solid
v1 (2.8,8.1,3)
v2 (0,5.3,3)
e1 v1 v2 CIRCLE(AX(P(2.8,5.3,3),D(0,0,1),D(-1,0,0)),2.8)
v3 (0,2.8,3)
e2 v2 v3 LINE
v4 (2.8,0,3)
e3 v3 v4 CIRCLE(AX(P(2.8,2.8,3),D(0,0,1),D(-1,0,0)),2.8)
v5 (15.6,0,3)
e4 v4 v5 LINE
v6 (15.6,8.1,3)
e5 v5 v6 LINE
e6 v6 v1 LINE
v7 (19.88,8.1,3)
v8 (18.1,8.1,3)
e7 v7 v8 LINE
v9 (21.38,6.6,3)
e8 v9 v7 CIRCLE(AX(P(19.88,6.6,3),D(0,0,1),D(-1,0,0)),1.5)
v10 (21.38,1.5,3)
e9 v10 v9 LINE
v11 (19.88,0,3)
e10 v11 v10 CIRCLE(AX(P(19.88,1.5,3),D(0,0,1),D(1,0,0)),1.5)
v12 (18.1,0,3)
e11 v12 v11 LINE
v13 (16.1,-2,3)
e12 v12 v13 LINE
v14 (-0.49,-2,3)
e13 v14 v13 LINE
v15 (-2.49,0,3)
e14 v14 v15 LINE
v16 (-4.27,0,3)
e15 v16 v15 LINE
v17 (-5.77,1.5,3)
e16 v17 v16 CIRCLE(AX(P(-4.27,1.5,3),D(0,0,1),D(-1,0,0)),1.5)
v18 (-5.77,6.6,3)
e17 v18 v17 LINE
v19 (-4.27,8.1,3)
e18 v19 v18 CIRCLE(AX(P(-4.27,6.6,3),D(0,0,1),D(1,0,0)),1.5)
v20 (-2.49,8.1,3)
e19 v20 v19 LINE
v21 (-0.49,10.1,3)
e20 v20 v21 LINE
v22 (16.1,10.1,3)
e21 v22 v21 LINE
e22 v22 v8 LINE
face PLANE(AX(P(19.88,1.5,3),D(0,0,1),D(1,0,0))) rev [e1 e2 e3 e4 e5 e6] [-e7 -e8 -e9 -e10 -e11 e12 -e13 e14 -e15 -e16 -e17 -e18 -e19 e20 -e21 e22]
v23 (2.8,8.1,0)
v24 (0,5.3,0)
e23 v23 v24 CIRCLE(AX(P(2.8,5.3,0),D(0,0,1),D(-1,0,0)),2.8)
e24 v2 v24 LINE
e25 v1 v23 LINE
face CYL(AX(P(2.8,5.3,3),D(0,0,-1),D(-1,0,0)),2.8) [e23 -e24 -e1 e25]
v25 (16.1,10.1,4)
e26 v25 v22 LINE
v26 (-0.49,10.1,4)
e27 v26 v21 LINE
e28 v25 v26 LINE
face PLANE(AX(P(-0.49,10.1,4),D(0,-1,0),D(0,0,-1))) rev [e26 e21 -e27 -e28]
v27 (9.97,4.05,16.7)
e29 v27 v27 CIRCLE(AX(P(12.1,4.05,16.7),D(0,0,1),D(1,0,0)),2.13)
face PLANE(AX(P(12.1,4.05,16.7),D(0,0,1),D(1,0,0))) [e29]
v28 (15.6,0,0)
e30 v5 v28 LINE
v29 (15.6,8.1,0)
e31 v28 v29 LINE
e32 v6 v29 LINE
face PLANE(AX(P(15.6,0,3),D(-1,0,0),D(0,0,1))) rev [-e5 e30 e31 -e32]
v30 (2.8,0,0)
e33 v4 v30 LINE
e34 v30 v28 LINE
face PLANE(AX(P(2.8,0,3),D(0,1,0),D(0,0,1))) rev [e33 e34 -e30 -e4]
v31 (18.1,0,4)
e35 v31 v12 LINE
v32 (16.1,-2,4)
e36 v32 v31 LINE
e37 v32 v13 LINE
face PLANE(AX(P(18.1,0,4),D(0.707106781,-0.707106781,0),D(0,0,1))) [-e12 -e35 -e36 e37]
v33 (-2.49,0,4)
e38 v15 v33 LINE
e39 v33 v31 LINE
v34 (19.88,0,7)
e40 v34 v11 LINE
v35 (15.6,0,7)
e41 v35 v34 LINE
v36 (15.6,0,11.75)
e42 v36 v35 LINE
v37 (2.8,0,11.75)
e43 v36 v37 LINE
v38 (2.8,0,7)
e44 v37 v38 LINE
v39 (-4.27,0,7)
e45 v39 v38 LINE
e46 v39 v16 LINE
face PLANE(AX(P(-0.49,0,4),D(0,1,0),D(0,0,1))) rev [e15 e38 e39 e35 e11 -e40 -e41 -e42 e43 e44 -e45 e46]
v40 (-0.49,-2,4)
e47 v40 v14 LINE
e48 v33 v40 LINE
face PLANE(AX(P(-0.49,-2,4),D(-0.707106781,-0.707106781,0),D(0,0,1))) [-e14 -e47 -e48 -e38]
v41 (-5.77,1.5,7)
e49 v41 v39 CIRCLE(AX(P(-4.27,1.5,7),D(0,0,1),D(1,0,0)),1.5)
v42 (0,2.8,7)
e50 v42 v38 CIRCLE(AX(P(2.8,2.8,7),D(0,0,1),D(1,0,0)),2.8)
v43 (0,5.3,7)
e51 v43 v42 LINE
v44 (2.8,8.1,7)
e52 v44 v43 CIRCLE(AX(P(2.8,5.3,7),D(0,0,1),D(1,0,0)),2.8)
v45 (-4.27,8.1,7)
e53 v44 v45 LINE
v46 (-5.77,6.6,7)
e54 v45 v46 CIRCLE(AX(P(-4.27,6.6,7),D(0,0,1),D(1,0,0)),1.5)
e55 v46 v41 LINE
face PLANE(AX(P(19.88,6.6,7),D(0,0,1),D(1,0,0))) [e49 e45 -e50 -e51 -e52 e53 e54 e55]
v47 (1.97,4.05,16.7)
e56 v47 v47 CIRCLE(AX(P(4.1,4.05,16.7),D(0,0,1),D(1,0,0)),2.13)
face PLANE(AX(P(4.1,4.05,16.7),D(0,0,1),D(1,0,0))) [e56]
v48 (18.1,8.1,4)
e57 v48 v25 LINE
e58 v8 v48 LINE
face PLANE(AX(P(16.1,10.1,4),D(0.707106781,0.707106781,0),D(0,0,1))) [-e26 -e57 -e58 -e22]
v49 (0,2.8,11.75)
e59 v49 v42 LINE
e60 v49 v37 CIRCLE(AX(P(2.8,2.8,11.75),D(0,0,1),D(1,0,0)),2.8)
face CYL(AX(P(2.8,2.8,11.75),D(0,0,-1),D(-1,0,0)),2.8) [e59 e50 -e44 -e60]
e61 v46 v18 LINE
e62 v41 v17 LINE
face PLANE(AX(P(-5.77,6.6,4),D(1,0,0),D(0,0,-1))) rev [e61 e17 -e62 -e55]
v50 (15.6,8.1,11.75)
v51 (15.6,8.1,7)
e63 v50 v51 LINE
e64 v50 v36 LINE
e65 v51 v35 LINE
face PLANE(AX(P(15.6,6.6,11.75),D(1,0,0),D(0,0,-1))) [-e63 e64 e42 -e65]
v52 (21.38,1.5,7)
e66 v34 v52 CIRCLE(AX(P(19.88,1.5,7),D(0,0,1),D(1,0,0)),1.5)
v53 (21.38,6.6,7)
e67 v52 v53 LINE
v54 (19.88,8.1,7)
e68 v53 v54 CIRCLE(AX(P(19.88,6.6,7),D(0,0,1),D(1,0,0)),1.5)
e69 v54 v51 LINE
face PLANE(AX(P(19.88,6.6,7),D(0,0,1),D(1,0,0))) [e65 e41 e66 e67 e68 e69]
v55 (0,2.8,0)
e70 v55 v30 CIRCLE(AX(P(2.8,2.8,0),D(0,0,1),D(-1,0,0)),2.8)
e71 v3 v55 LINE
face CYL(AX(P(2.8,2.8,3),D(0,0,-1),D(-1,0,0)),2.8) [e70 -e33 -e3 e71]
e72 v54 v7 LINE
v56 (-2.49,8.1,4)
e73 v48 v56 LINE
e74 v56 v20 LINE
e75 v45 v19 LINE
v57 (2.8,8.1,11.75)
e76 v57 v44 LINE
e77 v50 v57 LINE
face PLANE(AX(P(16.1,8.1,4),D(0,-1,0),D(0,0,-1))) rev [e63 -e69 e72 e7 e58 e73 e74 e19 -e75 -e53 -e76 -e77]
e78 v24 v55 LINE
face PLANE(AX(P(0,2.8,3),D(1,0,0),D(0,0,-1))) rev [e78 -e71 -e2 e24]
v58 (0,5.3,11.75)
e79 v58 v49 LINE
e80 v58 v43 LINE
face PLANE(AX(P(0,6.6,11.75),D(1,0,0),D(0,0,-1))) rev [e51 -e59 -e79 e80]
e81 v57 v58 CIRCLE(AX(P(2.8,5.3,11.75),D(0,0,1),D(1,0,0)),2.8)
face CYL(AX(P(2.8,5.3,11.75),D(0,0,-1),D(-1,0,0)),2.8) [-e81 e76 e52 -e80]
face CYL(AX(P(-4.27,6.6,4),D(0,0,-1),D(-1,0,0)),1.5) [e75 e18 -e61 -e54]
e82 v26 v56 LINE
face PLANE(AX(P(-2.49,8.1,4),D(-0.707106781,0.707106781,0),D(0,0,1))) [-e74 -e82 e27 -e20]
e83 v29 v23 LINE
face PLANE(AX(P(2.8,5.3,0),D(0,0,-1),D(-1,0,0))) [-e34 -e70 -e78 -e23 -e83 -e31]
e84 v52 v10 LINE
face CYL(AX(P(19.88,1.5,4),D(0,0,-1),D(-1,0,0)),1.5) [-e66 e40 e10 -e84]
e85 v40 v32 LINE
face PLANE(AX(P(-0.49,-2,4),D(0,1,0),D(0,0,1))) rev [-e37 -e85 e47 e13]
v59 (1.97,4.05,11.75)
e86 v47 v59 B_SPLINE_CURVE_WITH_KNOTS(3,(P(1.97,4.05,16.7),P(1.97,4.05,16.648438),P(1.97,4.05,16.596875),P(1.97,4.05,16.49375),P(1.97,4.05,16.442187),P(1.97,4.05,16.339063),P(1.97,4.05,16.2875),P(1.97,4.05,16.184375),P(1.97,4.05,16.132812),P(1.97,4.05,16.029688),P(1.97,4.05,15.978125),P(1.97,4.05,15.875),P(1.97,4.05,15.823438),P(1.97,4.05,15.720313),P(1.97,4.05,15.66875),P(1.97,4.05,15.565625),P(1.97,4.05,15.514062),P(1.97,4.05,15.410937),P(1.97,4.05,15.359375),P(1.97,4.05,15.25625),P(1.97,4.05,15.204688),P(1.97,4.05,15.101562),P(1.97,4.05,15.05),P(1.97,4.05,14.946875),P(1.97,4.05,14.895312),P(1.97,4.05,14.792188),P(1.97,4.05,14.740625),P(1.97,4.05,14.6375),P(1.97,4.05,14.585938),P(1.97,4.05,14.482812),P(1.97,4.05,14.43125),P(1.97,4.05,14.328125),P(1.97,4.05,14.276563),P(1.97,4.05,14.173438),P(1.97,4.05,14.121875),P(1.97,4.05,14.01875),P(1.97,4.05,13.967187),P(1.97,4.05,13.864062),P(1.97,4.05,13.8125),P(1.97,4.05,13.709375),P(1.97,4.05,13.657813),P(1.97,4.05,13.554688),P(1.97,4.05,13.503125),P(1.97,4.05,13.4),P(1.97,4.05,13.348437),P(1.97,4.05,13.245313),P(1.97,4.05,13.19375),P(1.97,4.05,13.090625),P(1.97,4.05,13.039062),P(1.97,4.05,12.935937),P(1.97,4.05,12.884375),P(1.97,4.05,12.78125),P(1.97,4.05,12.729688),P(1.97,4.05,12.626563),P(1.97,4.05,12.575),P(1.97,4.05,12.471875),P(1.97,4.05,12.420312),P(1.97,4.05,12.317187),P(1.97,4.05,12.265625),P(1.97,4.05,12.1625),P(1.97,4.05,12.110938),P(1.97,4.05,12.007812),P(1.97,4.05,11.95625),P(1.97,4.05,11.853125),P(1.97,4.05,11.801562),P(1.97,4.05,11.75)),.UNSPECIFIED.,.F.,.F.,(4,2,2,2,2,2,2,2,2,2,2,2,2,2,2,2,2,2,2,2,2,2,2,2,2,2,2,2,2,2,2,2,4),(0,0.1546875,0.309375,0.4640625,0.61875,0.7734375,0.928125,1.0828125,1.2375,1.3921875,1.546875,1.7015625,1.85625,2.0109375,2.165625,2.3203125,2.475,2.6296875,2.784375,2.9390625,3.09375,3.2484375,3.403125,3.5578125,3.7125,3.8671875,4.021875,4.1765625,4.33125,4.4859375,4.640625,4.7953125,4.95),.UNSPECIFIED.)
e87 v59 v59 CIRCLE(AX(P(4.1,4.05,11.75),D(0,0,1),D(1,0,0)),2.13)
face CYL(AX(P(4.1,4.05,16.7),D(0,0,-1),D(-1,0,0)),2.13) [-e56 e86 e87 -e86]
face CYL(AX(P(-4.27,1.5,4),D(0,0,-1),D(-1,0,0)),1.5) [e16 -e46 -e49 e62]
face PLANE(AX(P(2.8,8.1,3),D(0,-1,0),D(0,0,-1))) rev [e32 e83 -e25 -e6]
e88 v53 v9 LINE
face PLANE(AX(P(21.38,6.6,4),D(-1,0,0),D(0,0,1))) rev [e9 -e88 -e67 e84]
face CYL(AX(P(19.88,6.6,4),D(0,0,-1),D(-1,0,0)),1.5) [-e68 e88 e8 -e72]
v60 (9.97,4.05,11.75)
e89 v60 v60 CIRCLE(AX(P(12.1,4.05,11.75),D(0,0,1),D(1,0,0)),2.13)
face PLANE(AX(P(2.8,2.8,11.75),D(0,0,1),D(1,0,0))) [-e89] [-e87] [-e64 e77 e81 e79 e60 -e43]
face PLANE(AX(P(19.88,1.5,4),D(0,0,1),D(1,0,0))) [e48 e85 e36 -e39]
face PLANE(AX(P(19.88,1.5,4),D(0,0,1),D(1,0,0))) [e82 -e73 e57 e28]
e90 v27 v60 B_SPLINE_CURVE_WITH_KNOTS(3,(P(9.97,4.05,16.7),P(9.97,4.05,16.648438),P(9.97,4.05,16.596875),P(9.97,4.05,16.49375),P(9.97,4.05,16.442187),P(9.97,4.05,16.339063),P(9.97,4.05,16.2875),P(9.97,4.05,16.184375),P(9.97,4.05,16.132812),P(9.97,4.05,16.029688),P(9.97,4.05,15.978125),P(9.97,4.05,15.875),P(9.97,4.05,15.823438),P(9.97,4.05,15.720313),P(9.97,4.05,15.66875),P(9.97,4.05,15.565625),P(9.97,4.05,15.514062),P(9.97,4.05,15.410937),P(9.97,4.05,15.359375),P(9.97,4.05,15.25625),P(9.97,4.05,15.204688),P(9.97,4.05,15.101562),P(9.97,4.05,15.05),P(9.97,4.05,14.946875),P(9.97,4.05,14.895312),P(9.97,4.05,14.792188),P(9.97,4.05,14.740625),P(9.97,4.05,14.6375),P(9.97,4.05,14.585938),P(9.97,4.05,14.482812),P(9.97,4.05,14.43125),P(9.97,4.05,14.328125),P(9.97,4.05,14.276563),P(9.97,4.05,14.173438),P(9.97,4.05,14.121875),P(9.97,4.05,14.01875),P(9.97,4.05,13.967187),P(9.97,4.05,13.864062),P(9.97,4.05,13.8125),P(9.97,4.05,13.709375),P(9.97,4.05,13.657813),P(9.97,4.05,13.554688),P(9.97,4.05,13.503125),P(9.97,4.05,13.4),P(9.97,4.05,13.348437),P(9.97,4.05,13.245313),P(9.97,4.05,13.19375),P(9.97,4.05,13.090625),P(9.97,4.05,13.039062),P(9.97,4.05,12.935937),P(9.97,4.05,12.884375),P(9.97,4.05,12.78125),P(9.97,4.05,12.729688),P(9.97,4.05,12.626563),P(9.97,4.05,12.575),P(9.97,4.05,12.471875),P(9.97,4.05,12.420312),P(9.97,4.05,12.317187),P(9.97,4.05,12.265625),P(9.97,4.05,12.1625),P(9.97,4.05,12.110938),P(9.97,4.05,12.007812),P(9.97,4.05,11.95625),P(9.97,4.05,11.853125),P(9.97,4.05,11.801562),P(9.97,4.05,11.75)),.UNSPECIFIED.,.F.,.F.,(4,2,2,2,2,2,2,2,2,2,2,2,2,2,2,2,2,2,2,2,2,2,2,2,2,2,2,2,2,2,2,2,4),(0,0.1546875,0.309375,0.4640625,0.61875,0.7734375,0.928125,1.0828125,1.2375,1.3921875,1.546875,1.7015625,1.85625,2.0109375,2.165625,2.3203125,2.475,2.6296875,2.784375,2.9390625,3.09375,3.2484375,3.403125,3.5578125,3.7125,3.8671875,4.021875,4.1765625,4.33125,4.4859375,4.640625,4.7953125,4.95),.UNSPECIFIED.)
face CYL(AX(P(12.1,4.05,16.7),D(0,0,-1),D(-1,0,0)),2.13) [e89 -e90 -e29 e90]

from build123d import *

# Parameters (mm, degrees)
DODANIE_WYCI_GNI_CIE1_DEPTH = 3
DODANIE_WYCI_GNI_CIE2_DEPTH = 1
SFAZOWANIE1_SIZE            = 2
DODANIE_WYCI_GNI_CIE3_DEPTH = 3
DODANIE_WYCI_GNI_CIE4_START = 7
DODANIE_WYCI_GNI_CIE4_DEPTH = 4.75
SZKIC6_R                    = 2.13
DODANIE_WYCI_GNI_CIE5_DEPTH = 4.95


with BuildPart() as part:
    # Szkic1 → Dodanie-wyciągnięcie1 (new body)
    with BuildSketch(Plane.XY):
        with BuildLine():
            Line((2.8, 0), (15.6, 0))
            Line((15.6, 0), (15.6, 8.1))
            Line((15.6, 8.1), (2.8, 8.1))
            ThreePointArc((2.8, 8.1), (0.820101013, 7.279898987), (0, 5.3))
            Line((0, 5.3), (0, 2.8))
            ThreePointArc((0, 2.8), (0.820101013, 0.820101013), (2.8, 0))
        make_face()
    extrude(amount=DODANIE_WYCI_GNI_CIE1_DEPTH)

    # Szkic2 → Dodanie-wyciągnięcie2 (add)
    with BuildSketch(Plane.XY.offset(3)):
        with BuildLine():
            Line((-0.49, 10.1), (16.1, 10.1))
            Line((16.1, 10.1), (16.1, 8.1))
            Line((16.1, 8.1), (19.88, 8.1))
            ThreePointArc((19.88, 8.1), (20.940660172, 7.660660172), (21.38, 6.6))
            Line((21.38, 6.6), (21.38, 1.5))
            ThreePointArc((21.38, 1.5), (20.940660172, 0.439339828), (19.88, 0))
            Line((19.88, 0), (16.1, 0))
            Line((16.1, 0), (16.1, -2))
            Line((16.1, -2), (-0.49, -2))
            Line((-0.49, -2), (-0.49, 0))
            Line((-0.49, 0), (-4.27, 0))
            ThreePointArc((-4.27, 0), (-5.330660172, 0.439339828), (-5.77, 1.5))
            Line((-5.77, 1.5), (-5.77, 6.6))
            ThreePointArc((-5.77, 6.6), (-5.330660172, 7.660660172), (-4.27, 8.1))
            Line((-4.27, 8.1), (-0.49, 8.1))
            Line((-0.49, 8.1), (-0.49, 10.1))
        make_face()
    extrude(amount=DODANIE_WYCI_GNI_CIE2_DEPTH)

    # Sfazowanie1
    sfazowanie1_edges = [part.edges().sort_by_distance(p)[0] for p in [
        (16.1, 8.1, 3.5),
        (16.1, 0, 3.5),
        (-0.49, 0, 3.5),
        (-0.49, 8.1, 3.5),
    ]]
    chamfer(sfazowanie1_edges, length=SFAZOWANIE1_SIZE - 0.0001)  # a hair under: the kernel refuses the full size

    # Szkic4 → Dodanie-wyciągnięcie3 (add)
    with BuildSketch(Plane.XY.offset(4)):
        with BuildLine():
            Line((19.88, 8.1), (18.1, 8.1))
            Line((18.1, 8.1), (-2.49, 8.1))
            Line((-2.49, 8.1), (-4.27, 8.1))
            ThreePointArc((-4.27, 8.1), (-5.330660172, 7.660660172), (-5.77, 6.6))
            Line((-5.77, 6.6), (-5.77, 1.5))
            ThreePointArc((-5.77, 1.5), (-5.330660172, 0.439339828), (-4.27, 0))
            Line((-4.27, 0), (-2.49, 0))
            Line((-2.49, 0), (18.1, 0))
            Line((18.1, 0), (19.88, 0))
            ThreePointArc((19.88, 0), (20.940660172, 0.439339828), (21.38, 1.5))
            Line((21.38, 1.5), (21.38, 6.6))
            ThreePointArc((21.38, 6.6), (20.940660172, 7.660660172), (19.88, 8.1))
        make_face()
    extrude(amount=DODANIE_WYCI_GNI_CIE3_DEPTH)

    # Szkic1<2> → Dodanie-wyciągnięcie4 (add)
    with BuildSketch(Plane.XY.offset(DODANIE_WYCI_GNI_CIE4_START)):
        with BuildLine():
            Line((2.8, 0), (15.6, 0))
            Line((15.6, 0), (15.6, 8.1))
            Line((15.6, 8.1), (2.8, 8.1))
            ThreePointArc((2.8, 8.1), (0.820101013, 7.279898987), (0, 5.3))
            Line((0, 5.3), (0, 2.8))
            ThreePointArc((0, 2.8), (0.820101013, 0.820101013), (2.8, 0))
        make_face()
    extrude(amount=DODANIE_WYCI_GNI_CIE4_DEPTH)

    # Szkic6 → Dodanie-wyciągnięcie5 (add)
    with BuildSketch(Plane.XY.offset(11.75)):
        with Locations(Location((4.1, 4.05, 0), (0, 0, 180))):
            Circle(SZKIC6_R)
        with Locations(Location((12.1, 4.05, 0), (0, 0, 180))):
            Circle(SZKIC6_R)
    extrude(amount=DODANIE_WYCI_GNI_CIE5_DEPTH)


solid = part.part
